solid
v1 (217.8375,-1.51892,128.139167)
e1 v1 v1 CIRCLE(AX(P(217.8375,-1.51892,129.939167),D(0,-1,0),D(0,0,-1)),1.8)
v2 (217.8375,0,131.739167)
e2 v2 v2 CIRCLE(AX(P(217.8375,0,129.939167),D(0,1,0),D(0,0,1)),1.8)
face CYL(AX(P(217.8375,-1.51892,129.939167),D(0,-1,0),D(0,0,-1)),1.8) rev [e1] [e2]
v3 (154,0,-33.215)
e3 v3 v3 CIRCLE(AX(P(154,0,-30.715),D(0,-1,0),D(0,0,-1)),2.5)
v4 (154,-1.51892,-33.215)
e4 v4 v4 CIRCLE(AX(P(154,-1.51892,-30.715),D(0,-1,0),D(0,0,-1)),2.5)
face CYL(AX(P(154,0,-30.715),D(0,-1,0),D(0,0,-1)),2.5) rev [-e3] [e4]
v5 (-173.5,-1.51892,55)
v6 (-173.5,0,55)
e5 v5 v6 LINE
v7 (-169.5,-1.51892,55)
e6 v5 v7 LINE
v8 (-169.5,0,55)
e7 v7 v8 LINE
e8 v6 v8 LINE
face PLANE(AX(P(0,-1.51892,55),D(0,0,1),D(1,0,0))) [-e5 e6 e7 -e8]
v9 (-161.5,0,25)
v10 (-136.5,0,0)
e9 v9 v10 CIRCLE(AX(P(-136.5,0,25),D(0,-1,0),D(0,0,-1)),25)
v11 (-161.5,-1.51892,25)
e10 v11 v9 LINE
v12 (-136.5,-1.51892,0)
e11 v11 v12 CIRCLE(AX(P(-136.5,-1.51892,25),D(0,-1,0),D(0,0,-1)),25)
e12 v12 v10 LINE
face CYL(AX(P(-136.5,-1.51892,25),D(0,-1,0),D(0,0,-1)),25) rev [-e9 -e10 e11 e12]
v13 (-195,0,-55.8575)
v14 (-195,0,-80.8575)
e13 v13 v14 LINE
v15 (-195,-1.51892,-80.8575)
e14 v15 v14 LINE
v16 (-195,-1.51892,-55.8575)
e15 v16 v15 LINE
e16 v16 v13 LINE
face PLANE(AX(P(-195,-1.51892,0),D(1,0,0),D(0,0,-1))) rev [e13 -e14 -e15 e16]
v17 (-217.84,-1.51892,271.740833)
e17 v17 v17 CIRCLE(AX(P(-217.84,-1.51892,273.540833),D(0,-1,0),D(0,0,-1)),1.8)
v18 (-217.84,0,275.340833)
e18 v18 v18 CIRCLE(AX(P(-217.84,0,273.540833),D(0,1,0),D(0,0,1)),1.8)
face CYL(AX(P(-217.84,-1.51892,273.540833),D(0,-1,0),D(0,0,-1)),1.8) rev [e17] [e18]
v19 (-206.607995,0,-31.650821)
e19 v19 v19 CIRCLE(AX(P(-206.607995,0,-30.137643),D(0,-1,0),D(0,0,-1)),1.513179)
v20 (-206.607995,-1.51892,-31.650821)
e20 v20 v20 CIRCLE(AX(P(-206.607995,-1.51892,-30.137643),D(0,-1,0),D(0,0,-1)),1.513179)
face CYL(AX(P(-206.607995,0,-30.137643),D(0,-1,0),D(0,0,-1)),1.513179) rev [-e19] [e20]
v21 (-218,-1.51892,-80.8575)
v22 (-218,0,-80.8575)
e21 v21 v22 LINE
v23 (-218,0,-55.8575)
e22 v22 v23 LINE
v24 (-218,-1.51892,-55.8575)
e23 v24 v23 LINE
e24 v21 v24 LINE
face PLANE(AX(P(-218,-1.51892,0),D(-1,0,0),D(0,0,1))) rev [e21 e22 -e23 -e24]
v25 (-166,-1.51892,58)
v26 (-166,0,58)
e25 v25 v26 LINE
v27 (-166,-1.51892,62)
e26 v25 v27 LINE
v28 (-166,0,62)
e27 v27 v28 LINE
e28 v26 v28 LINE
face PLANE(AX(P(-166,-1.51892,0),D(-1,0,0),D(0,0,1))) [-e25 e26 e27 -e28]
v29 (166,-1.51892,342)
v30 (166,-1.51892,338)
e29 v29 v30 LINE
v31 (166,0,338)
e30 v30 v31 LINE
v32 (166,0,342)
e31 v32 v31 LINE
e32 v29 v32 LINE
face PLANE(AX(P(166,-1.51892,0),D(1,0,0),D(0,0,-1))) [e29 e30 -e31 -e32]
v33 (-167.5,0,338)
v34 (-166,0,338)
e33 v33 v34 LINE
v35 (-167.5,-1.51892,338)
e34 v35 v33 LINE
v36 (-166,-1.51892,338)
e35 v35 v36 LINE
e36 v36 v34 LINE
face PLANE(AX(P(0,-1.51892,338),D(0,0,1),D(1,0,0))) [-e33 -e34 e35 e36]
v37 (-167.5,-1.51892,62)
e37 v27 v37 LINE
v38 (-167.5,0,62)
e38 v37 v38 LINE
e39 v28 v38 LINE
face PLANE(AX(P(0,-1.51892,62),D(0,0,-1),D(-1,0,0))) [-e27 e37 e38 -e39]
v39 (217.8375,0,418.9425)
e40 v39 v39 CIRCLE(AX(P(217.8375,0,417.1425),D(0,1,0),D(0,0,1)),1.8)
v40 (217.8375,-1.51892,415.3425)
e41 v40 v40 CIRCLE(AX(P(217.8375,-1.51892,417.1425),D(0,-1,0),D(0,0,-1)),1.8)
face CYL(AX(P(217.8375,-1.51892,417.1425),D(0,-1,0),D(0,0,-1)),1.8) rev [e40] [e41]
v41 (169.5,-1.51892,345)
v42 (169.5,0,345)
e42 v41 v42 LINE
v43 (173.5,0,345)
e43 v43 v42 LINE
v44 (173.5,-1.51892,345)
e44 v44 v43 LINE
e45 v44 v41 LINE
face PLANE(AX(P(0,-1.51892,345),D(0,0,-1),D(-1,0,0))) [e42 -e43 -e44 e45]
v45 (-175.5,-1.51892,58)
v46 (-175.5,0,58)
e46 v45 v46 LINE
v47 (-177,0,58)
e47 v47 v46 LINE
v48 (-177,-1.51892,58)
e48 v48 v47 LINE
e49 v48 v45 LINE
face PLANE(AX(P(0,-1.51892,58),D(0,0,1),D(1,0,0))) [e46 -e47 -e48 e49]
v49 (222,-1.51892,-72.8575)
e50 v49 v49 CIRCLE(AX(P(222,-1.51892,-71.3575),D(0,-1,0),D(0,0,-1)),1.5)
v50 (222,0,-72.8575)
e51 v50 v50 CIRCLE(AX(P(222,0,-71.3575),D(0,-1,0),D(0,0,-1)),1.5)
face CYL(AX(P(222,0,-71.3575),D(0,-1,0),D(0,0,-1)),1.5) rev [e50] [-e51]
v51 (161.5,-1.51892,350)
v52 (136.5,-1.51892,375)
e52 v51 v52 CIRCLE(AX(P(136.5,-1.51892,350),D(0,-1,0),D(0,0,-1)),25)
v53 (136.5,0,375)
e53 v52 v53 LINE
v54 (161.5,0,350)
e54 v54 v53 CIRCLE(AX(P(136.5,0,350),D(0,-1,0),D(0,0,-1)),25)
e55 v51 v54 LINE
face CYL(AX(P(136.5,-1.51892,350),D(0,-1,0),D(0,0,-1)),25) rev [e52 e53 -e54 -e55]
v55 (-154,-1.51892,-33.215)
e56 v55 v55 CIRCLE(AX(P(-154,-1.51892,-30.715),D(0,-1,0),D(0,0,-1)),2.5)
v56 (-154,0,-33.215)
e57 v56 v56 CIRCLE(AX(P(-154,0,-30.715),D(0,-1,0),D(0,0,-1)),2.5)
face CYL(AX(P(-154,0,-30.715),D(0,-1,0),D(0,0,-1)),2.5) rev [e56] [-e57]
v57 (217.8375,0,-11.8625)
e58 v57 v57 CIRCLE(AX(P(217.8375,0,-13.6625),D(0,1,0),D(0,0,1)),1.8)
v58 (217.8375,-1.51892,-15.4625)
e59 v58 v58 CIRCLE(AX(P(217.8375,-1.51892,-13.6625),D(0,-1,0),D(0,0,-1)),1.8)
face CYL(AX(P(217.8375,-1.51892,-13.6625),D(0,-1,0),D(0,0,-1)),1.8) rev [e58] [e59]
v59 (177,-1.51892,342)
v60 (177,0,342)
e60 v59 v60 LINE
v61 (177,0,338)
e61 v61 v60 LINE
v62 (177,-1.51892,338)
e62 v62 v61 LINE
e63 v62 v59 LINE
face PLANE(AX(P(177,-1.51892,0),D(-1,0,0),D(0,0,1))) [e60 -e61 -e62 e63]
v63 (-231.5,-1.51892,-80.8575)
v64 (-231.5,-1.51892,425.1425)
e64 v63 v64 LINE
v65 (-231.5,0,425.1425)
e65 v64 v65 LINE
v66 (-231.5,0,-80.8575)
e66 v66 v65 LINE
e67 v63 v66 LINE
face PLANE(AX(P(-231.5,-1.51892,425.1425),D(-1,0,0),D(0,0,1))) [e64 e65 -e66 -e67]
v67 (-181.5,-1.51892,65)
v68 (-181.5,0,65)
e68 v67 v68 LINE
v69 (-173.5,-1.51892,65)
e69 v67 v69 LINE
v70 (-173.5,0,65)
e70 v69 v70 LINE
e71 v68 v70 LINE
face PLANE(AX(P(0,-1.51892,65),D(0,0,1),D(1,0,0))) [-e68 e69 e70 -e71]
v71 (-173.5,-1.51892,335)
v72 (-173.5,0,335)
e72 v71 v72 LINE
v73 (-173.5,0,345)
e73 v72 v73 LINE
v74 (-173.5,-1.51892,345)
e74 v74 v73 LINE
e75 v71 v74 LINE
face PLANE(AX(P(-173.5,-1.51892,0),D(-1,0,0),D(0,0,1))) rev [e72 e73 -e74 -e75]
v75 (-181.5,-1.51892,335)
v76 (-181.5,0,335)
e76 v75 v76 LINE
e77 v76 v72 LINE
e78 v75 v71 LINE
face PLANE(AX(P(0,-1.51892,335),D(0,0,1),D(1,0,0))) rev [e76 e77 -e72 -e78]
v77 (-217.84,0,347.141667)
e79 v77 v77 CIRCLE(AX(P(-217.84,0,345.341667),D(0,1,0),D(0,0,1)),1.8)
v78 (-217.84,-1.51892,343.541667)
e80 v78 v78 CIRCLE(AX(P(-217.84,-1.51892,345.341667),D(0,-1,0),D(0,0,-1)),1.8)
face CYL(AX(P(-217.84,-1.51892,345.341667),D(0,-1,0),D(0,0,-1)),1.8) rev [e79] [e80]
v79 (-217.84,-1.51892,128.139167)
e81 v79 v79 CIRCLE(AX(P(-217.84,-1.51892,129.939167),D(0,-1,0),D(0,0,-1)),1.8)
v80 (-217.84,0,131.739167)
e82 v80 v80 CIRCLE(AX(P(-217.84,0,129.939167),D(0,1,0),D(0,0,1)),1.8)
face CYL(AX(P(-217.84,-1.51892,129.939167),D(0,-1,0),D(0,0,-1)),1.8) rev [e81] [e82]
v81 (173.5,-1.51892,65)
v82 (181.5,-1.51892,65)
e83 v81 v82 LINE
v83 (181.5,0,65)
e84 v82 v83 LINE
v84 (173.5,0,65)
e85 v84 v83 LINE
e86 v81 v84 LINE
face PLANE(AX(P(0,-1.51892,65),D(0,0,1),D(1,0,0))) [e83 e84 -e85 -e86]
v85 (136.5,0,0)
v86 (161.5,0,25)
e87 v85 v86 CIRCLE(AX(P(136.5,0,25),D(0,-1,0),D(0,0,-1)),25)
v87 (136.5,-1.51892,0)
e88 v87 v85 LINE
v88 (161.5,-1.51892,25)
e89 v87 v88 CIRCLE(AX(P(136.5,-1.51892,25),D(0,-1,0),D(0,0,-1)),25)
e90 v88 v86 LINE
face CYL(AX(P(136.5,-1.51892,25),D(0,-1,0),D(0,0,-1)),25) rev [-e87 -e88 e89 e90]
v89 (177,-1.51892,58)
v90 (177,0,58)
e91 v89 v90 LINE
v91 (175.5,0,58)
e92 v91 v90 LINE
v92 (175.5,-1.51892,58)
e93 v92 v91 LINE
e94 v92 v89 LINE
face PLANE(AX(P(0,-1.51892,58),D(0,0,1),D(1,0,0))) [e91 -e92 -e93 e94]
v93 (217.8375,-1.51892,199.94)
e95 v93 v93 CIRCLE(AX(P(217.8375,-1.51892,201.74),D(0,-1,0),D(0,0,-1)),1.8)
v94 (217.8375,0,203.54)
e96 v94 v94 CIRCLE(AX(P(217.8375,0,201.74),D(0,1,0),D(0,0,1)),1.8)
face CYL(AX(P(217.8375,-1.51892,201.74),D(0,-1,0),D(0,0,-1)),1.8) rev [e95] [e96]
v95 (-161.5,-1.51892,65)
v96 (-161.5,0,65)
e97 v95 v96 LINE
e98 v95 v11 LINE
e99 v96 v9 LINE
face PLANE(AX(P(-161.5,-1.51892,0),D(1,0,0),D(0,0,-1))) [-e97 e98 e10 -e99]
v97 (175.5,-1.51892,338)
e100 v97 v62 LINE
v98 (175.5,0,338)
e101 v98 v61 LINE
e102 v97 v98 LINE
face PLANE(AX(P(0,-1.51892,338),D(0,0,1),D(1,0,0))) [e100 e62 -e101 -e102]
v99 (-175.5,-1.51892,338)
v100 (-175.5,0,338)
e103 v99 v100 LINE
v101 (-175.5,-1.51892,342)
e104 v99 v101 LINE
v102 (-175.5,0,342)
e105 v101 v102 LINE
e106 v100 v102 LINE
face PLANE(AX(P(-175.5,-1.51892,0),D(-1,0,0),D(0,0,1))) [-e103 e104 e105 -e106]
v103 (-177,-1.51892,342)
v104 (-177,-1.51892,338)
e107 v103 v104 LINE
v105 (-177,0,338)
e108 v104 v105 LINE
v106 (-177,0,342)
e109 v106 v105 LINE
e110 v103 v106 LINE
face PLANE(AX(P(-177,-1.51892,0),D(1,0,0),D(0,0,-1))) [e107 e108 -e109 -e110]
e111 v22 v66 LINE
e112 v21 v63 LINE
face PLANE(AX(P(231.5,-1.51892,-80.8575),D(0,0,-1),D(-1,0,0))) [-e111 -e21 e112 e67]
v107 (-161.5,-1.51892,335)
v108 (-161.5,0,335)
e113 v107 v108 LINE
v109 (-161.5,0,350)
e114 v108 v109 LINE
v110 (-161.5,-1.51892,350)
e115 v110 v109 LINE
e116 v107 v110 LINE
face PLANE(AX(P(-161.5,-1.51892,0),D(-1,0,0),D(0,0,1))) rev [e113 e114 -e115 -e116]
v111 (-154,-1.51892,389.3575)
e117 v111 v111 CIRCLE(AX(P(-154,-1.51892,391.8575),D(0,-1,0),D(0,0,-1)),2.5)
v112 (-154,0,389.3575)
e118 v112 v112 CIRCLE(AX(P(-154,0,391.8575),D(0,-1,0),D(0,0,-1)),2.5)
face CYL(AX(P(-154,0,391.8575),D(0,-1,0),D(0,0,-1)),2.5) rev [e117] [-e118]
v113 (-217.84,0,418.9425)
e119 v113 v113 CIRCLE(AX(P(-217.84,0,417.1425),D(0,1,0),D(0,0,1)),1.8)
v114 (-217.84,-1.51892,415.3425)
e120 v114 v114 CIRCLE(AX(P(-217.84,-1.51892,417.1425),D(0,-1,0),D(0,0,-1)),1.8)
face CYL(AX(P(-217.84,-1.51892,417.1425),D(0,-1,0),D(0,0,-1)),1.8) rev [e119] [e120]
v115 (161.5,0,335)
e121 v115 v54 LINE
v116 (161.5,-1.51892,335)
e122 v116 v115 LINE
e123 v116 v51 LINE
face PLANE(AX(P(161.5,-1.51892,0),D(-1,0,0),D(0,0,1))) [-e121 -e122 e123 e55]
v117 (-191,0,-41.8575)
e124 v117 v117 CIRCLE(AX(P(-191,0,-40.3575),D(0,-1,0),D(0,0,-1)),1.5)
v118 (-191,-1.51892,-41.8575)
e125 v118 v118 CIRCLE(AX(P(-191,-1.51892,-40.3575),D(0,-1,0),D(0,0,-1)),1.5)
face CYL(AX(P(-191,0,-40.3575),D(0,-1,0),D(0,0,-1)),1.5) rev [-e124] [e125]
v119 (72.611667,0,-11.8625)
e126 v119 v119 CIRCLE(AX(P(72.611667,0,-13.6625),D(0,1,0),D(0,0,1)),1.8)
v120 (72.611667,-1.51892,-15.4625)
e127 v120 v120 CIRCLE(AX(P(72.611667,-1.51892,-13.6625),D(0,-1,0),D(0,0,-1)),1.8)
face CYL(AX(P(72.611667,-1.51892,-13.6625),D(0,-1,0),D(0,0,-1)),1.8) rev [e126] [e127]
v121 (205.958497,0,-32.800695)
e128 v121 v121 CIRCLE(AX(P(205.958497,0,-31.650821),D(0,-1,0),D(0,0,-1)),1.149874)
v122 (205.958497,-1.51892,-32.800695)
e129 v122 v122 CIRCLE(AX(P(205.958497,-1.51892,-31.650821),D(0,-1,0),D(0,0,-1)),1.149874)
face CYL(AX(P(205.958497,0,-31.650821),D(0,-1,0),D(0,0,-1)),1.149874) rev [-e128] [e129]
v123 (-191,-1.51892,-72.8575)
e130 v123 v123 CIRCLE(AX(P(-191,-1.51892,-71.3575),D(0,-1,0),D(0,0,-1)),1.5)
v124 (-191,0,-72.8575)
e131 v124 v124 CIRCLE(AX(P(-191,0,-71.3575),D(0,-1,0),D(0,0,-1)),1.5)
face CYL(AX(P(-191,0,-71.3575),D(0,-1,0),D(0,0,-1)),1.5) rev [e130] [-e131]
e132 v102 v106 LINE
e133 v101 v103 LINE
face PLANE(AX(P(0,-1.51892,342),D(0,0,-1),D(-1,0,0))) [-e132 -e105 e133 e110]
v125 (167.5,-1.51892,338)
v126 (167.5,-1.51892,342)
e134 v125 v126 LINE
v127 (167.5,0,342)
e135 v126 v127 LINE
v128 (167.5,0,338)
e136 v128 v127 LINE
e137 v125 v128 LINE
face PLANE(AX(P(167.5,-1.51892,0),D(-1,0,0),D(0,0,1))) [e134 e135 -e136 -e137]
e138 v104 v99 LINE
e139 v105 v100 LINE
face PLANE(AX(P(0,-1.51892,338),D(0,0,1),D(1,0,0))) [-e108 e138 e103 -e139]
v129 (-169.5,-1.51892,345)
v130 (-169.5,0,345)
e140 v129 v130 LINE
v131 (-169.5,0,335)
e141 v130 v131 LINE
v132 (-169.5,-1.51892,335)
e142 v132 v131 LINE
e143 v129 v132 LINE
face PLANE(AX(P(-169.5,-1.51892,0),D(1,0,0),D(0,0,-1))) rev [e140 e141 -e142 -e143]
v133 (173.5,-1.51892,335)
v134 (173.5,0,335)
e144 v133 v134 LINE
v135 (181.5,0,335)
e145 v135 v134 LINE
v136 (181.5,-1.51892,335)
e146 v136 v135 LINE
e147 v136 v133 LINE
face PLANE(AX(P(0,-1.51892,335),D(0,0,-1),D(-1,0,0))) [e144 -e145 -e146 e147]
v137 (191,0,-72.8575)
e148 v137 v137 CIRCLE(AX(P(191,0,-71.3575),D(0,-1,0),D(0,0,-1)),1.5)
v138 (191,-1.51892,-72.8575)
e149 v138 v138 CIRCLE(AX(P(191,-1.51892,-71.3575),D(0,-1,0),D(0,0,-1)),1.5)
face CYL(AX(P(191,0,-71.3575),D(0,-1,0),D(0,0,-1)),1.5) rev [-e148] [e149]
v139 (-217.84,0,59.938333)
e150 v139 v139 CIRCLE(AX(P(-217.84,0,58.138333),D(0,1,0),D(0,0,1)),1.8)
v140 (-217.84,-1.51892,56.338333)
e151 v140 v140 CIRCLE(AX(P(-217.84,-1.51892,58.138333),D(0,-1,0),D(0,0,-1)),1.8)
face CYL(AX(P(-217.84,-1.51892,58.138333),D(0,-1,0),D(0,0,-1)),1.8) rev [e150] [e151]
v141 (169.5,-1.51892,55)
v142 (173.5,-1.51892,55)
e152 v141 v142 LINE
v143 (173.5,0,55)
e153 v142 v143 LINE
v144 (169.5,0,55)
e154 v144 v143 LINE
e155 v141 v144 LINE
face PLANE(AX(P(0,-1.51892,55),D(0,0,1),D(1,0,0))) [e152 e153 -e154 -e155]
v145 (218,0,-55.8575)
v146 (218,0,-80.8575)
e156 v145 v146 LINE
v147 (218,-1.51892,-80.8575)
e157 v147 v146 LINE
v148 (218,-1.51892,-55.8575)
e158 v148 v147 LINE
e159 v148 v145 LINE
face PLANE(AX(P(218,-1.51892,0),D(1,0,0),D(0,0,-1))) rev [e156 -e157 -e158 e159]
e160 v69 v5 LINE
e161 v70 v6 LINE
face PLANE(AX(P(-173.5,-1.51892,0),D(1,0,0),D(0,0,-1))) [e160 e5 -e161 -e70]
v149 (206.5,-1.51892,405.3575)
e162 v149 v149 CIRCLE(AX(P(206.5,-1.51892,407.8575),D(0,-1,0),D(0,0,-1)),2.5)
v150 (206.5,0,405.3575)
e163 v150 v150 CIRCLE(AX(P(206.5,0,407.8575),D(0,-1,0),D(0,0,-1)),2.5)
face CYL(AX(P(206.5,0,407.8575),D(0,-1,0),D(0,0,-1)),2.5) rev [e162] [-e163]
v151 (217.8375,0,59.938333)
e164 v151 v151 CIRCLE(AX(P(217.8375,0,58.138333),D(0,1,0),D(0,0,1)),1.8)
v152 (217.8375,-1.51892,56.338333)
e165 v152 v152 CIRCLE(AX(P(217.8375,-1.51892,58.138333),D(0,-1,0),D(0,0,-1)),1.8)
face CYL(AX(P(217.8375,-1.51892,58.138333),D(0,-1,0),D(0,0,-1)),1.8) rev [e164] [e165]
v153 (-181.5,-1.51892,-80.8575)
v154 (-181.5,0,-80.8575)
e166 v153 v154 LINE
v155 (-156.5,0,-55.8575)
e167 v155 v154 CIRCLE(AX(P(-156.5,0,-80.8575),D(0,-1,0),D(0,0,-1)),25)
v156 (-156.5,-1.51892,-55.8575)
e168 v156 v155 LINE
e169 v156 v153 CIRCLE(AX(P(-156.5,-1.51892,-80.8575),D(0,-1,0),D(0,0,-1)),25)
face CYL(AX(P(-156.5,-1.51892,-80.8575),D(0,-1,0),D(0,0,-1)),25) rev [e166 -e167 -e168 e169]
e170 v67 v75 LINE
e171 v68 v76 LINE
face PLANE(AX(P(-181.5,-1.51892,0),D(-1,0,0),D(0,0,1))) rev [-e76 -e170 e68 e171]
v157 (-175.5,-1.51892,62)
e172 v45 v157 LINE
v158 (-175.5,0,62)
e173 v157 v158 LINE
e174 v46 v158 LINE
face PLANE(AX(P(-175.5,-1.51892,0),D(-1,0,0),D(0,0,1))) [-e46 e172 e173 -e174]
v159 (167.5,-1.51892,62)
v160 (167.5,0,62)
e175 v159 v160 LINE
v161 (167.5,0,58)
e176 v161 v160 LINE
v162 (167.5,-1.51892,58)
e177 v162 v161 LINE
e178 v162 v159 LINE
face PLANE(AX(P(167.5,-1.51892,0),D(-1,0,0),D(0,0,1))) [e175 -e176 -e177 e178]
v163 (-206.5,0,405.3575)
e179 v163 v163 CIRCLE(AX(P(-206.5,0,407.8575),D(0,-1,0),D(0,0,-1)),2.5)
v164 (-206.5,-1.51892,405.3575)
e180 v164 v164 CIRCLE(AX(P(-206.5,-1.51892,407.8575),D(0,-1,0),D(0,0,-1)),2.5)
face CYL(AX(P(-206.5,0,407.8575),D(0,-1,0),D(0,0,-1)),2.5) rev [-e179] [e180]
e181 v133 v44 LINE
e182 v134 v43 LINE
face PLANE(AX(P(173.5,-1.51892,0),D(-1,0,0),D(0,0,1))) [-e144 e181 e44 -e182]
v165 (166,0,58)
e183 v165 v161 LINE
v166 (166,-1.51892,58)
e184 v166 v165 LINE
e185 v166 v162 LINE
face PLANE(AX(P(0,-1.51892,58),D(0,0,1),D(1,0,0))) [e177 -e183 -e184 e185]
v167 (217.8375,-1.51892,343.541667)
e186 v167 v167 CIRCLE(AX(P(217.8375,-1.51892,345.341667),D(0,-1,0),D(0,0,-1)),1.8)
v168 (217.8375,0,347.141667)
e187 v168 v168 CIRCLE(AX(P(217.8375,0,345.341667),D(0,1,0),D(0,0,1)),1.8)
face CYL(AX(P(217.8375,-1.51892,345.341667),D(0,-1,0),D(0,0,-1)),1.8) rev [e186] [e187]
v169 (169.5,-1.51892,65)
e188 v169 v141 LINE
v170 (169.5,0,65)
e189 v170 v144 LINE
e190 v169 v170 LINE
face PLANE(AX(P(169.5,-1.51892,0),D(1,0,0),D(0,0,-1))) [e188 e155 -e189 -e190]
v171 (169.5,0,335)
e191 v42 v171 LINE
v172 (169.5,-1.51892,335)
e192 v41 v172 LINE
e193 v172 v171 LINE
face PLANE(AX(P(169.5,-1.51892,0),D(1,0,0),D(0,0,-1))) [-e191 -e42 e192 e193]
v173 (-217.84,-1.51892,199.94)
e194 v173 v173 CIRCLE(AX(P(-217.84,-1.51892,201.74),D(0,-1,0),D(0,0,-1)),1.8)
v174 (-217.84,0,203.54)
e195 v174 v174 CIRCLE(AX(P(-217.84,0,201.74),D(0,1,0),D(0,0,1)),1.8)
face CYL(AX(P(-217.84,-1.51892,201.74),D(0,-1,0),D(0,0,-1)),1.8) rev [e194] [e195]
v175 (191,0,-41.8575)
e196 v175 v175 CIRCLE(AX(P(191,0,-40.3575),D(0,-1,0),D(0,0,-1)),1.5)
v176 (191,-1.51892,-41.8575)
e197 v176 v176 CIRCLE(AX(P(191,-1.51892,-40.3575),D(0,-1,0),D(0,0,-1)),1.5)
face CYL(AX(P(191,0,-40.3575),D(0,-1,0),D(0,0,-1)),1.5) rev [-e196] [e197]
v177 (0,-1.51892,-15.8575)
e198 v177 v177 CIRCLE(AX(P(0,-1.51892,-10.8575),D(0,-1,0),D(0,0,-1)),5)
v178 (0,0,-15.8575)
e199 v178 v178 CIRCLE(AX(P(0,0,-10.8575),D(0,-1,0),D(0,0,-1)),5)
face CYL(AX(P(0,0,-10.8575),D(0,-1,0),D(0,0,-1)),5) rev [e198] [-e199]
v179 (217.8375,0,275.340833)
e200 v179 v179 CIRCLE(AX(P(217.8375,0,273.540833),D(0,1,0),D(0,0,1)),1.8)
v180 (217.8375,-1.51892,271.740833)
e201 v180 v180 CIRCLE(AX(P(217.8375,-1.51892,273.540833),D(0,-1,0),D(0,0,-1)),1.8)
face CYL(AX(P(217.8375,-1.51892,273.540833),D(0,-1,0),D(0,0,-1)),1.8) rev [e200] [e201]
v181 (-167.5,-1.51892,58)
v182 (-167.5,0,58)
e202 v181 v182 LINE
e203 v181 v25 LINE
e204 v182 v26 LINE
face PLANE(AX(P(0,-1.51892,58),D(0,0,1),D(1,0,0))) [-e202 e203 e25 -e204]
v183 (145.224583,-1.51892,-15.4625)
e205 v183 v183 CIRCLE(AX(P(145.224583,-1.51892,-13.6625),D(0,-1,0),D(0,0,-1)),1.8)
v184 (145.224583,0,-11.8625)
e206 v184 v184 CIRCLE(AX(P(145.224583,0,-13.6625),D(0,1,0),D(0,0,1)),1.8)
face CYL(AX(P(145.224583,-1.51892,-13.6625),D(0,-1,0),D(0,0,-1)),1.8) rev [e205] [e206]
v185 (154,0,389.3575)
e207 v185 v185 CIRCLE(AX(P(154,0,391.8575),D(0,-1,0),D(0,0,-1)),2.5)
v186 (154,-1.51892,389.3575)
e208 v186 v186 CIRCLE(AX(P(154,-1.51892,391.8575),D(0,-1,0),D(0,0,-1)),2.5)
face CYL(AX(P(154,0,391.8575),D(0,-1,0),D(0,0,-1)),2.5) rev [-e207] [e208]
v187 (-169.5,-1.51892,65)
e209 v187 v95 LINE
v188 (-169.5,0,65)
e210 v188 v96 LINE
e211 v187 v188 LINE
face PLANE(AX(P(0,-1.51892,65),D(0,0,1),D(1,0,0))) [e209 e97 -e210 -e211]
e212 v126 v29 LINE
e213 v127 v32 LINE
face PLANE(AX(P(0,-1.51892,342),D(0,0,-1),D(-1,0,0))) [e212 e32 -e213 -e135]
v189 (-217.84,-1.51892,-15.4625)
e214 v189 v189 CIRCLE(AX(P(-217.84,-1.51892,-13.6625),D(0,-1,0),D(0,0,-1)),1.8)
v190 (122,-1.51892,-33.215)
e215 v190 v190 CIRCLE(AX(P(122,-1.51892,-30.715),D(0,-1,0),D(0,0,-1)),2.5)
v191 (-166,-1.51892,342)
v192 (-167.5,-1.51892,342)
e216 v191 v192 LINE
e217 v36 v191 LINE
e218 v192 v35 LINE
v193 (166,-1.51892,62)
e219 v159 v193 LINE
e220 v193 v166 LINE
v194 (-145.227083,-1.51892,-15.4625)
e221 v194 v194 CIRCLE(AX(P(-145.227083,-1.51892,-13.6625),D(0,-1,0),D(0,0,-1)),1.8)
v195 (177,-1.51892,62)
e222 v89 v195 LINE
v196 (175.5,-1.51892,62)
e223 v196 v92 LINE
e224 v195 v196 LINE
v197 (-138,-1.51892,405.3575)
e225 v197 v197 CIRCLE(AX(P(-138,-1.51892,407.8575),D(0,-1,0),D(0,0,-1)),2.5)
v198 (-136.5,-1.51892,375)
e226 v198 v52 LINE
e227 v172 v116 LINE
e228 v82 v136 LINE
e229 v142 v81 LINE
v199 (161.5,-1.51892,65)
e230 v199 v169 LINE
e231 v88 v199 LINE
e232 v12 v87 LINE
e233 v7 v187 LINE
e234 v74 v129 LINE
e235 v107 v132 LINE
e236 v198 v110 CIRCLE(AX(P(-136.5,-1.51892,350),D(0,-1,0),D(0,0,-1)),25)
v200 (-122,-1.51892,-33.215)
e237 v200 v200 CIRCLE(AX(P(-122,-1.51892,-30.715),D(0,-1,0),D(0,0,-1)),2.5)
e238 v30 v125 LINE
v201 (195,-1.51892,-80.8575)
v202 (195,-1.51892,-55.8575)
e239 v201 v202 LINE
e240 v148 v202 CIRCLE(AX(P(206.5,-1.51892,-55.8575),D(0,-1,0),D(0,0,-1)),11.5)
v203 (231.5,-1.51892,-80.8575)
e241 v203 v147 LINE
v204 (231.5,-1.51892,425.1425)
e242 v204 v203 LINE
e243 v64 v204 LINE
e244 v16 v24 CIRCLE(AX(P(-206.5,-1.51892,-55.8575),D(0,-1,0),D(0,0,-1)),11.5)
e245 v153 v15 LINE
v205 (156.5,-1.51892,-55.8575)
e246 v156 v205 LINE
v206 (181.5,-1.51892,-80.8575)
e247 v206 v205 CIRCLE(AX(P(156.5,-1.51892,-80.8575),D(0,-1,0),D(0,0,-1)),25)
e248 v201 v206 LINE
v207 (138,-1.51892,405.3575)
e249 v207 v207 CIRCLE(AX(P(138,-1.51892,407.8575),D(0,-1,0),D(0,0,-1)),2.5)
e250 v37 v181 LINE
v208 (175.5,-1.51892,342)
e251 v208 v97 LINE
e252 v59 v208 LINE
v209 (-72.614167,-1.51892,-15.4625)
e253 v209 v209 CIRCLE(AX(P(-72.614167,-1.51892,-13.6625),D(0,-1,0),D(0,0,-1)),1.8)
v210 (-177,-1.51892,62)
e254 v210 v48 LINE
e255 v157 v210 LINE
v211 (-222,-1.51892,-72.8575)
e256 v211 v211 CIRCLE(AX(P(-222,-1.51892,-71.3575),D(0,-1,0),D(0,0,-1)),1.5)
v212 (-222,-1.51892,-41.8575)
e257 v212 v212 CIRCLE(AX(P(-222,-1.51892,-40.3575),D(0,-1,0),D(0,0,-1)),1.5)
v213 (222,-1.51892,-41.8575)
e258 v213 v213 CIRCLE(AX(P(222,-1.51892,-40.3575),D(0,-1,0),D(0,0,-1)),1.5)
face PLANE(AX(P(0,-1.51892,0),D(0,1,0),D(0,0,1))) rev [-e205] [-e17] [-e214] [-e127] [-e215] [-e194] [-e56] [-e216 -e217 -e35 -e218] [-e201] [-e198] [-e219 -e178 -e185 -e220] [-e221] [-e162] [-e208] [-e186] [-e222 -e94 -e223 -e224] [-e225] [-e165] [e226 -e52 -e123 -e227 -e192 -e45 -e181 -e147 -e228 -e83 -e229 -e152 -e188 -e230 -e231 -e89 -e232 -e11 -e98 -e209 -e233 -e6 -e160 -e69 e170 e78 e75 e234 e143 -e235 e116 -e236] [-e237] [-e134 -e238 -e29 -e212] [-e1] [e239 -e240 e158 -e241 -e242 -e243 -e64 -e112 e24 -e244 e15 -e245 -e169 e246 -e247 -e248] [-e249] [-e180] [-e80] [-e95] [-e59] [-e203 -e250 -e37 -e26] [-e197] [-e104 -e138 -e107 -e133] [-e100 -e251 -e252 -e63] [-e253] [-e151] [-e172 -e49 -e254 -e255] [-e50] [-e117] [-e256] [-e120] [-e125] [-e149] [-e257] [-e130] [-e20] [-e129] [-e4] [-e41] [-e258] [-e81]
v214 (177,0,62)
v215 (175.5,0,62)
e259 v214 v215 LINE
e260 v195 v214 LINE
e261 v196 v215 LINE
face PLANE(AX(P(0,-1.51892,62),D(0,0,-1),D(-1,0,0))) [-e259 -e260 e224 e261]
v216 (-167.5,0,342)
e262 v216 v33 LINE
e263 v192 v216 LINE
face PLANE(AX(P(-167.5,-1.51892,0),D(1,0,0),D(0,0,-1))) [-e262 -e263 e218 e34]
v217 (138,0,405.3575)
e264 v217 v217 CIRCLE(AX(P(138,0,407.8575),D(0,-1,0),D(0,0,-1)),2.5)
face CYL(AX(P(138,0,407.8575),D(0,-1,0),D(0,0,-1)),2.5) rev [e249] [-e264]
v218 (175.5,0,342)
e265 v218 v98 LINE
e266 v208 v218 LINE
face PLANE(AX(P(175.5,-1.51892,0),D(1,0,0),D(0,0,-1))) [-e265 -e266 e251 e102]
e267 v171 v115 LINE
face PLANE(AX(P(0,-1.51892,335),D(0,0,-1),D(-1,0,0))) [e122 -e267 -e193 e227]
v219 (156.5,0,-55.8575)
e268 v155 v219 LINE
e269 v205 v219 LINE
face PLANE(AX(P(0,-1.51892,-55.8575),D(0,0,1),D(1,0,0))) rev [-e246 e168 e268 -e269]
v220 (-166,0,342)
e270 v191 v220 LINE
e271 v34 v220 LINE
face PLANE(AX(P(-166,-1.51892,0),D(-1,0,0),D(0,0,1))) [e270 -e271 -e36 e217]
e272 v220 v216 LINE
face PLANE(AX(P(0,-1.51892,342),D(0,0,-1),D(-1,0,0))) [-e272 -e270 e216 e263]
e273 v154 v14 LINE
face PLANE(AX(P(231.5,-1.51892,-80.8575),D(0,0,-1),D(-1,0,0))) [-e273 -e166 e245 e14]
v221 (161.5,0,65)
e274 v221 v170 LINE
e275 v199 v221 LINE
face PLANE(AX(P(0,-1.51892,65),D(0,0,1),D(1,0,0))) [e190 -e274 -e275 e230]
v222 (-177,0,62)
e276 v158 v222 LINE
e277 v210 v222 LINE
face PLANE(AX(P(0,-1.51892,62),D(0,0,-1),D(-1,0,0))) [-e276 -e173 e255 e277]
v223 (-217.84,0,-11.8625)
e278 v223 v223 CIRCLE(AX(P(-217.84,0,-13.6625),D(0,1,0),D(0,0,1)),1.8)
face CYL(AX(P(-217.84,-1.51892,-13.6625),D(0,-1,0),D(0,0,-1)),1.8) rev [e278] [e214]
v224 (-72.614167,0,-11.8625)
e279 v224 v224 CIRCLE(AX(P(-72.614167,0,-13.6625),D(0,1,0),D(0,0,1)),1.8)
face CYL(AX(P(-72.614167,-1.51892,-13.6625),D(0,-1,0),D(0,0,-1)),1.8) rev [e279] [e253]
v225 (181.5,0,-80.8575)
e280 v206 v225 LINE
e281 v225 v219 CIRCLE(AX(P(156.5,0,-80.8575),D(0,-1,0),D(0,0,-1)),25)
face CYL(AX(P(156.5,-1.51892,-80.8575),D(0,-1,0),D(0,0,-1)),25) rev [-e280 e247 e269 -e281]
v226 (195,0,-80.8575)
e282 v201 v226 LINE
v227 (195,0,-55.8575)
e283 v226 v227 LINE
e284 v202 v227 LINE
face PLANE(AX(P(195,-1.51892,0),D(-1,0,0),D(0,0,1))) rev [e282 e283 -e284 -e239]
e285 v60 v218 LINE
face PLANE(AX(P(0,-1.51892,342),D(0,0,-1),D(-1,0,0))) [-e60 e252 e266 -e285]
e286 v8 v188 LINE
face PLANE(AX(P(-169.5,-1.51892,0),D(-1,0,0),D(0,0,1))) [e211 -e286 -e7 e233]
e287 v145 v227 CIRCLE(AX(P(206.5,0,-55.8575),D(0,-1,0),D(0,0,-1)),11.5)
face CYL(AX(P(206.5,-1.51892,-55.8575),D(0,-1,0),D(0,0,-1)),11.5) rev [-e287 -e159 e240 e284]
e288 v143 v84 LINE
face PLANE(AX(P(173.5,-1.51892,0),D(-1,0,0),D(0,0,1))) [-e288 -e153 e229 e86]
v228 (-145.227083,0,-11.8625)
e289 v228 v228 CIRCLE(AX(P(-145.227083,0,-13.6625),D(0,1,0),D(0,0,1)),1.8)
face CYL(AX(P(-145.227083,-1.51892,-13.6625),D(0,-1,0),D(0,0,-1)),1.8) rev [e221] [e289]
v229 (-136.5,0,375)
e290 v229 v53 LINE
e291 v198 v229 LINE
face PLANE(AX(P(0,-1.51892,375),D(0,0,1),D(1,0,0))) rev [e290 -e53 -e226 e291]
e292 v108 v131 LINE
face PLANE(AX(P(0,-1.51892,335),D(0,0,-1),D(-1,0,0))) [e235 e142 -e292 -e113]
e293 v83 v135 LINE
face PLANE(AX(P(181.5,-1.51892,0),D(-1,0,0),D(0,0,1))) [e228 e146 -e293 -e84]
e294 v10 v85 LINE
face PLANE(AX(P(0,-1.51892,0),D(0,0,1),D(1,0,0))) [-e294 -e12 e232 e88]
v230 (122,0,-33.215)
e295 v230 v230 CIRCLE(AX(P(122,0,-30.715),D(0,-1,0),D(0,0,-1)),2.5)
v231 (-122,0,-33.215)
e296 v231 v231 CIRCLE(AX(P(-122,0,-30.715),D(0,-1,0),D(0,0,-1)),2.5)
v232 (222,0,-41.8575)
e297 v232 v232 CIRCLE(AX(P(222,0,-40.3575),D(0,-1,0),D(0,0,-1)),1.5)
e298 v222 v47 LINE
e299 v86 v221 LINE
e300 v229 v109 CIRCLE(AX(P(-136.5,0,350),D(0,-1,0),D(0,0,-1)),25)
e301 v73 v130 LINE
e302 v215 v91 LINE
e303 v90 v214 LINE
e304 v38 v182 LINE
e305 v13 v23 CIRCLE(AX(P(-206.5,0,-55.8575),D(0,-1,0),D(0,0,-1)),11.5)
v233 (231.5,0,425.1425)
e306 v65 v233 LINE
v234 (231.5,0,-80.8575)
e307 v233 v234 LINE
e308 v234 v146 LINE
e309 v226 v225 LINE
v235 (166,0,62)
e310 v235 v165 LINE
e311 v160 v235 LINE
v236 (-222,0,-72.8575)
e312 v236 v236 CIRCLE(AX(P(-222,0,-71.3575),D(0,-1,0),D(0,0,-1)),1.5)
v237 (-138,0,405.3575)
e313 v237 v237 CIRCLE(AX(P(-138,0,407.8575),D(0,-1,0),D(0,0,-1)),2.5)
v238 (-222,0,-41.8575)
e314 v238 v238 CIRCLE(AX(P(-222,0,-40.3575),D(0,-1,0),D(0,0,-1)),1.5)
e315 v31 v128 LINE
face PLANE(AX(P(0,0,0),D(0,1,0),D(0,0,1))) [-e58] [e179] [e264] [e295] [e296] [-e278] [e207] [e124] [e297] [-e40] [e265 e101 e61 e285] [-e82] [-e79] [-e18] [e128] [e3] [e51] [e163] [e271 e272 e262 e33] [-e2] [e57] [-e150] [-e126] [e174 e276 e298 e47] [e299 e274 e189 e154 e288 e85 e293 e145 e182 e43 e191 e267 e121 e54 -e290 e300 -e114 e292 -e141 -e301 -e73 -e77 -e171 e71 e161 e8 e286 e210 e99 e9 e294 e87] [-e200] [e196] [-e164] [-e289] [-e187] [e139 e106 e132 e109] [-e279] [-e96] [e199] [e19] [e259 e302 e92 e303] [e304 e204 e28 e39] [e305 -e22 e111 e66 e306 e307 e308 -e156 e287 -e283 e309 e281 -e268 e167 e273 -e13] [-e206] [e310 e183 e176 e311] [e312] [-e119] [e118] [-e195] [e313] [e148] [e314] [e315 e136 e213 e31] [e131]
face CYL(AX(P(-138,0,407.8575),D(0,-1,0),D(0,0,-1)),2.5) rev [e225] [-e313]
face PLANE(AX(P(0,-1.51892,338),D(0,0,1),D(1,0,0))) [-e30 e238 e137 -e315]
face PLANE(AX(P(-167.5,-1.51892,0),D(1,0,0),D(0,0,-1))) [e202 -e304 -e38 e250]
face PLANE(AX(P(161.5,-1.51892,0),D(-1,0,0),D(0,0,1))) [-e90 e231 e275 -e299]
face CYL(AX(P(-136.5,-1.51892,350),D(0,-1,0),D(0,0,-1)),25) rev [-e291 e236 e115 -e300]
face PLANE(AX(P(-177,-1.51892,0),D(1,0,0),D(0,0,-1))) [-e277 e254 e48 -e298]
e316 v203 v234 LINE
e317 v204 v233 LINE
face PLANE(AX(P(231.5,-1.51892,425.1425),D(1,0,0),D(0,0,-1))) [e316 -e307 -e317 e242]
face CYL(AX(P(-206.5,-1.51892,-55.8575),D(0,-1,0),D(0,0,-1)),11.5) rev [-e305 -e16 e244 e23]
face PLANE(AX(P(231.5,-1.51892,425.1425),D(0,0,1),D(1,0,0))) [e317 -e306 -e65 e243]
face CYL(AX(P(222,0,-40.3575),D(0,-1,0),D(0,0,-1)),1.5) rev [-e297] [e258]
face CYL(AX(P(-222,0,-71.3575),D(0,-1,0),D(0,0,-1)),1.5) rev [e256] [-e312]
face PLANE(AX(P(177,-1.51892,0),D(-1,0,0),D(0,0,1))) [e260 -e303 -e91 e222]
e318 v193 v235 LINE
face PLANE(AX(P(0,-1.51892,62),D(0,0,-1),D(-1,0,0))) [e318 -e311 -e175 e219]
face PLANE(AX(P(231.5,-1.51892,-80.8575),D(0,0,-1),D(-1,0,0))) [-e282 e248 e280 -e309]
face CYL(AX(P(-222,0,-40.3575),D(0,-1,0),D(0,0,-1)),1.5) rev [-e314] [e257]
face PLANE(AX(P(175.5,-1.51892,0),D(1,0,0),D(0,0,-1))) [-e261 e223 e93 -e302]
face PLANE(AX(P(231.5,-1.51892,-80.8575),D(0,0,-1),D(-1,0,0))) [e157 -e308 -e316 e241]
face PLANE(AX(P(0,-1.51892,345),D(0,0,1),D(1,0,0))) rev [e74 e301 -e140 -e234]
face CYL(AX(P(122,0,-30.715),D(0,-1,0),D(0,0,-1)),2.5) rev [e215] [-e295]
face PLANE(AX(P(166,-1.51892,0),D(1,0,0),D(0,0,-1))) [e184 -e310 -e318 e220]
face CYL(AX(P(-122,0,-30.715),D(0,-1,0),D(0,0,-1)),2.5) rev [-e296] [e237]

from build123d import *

# Parameters (mm, degrees)
SKETCH24_W               = 463
SKETCH24_H               = 506
BASE_FLANGE1_DEPTH       = 1.51892
SKETCH33_W               = 1.5
SKETCH33_H               = 4
SKETCH33_R               = 2.5
SKETCH33_R_2             = 1.5
SKETCH33_R_3             = 5
CUT_EXTRUDE1_DEPTH       = 1.51892
SKETCH35_R               = 1.513178902
SKETCH35_R_2             = 1.149873802
CUT_EXTRUDE3_DEPTH       = 10
M3_CLEARANCE_HOLE1_D     = 3.6
M3_CLEARANCE_HOLE1_DEPTH = 11.938
M3_CLEARANCE_HOLE1_TIP   = 1.081549114


# Sheet-metal steps are written as plain solids
with BuildPart() as part:
    # Sketch24 → Base-Flange1 (new body)
    with BuildSketch(Plane(origin=(0, 0, 0), x_dir=(1, 0, 0), z_dir=(0, 1, 0))):
        with Locations((0, -172.1425)):
            Rectangle(SKETCH24_W, SKETCH24_H)
    extrude(amount=-BASE_FLANGE1_DEPTH)

    # Sketch33 → Cut-Extrude1 (cut)
    with BuildSketch(Plane.XZ.offset(1.51892)):
        with BuildLine():
            Line((136.5, 375), (-136.5, 375))
            ThreePointArc((-136.5, 375), (-154.17766953, 367.67766953), (-161.5, 350))
            Line((-161.5, 350), (-161.5, 335))
            Line((-161.5, 335), (-169.5, 335))
            Line((-169.5, 335), (-169.5, 345))
            Line((-169.5, 345), (-173.5, 345))
            Line((-173.5, 345), (-173.5, 335))
            Line((-173.5, 335), (-181.5, 335))
            Line((-181.5, 335), (-181.5, 65))
            Line((-181.5, 65), (-173.5, 65))
            Line((-173.5, 65), (-173.5, 55))
            Line((-173.5, 55), (-169.5, 55))
            Line((-169.5, 55), (-169.5, 65))
            Line((-169.5, 65), (-161.5, 65))
            Line((-161.5, 65), (-161.5, 25))
            ThreePointArc((-161.5, 25), (-154.17766953, 7.32233047), (-136.5, 0))
            Line((-136.5, 0), (136.5, 0))
            ThreePointArc((136.5, 0), (154.17766953, 7.32233047), (161.5, 25))
            Line((161.5, 25), (161.5, 65))
            Line((161.5, 65), (169.5, 65))
            Line((169.5, 65), (169.5, 55))
            Line((169.5, 55), (173.5, 55))
            Line((173.5, 55), (173.5, 65))
            Line((173.5, 65), (181.5, 65))
            Line((181.5, 65), (181.5, 335))
            Line((181.5, 335), (173.5, 335))
            Line((173.5, 335), (173.5, 345))
            Line((173.5, 345), (169.5, 345))
            Line((169.5, 345), (169.5, 335))
            Line((169.5, 335), (161.5, 335))
            Line((161.5, 335), (161.5, 350))
            ThreePointArc((161.5, 350), (154.17766953, 367.67766953), (136.5, 375))
        make_face()
        with Locations((-176.25, 60)):
            Rectangle(SKETCH33_W, SKETCH33_H)
        with Locations((-166.75, 60)):
            Rectangle(SKETCH33_W, SKETCH33_H)
        with Locations((176.25, 60)):
            Rectangle(SKETCH33_W, SKETCH33_H)
        with Locations((166.75, 60)):
            Rectangle(SKETCH33_W, SKETCH33_H)
        with Locations((176.25, 340)):
            Rectangle(SKETCH33_W, SKETCH33_H)
        with Locations((166.75, 340)):
            Rectangle(SKETCH33_W, SKETCH33_H)
        with Locations((-166.75, 340)):
            Rectangle(SKETCH33_W, SKETCH33_H)
        with Locations((-176.25, 340)):
            Rectangle(SKETCH33_W, SKETCH33_H)
        with BuildLine():
            Line((195, -55.8575), (195, -80.8575))
            Line((195, -80.8575), (218, -80.8575))
            Line((218, -80.8575), (218, -55.8575))
            ThreePointArc((218, -55.8575), (206.5, -44.3575), (195, -55.8575))
        make_face()
        with BuildLine():
            ThreePointArc((-156.5, -55.8575), (-174.17766953, -63.17983047), (-181.5, -80.8575))
            Line((-181.5, -80.8575), (181.5, -80.8575))
            ThreePointArc((181.5, -80.8575), (174.17766953, -63.17983047), (156.5, -55.8575))
            Line((156.5, -55.8575), (-156.5, -55.8575))
        make_face()
        with BuildLine():
            Line((-218, -55.8575), (-218, -80.8575))
            Line((-218, -80.8575), (-195, -80.8575))
            Line((-195, -80.8575), (-195, -55.8575))
            ThreePointArc((-195, -55.8575), (-206.5, -44.3575), (-218, -55.8575))
        make_face()
        with Locations(Location((-206.5, 407.8575, 0), (0, 0, 270))):
            Circle(SKETCH33_R)
        with Locations(Location((-154, 391.8575, 0), (0, 0, 270))):
            Circle(SKETCH33_R)
        with Locations(Location((-138, 407.8575, 0), (0, 0, 270))):
            Circle(SKETCH33_R)
        with Locations(Location((138, 407.8575, 0), (0, 0, 270))):
            Circle(SKETCH33_R)
        with Locations(Location((154, 391.8575, 0), (0, 0, 270))):
            Circle(SKETCH33_R)
        with Locations(Location((206.5, 407.8575, 0), (0, 0, 270))):
            Circle(SKETCH33_R)
        with Locations(Location((154, -30.715, 0), (0, 0, 270))):
            Circle(SKETCH33_R)
        with Locations(Location((122, -30.715, 0), (0, 0, 270))):
            Circle(SKETCH33_R)
        with Locations(Location((191, -40.3575, 0), (0, 0, 270))):
            Circle(SKETCH33_R_2)
        with Locations(Location((191, -71.3575, 0), (0, 0, 270))):
            Circle(SKETCH33_R_2)
        with Locations(Location((222, -40.3575, 0), (0, 0, 270))):
            Circle(SKETCH33_R_2)
        with Locations(Location((222, -71.3575, 0), (0, 0, 270))):
            Circle(SKETCH33_R_2)
        with Locations(Location((-154, -30.715, 0), (0, 0, 270))):
            Circle(SKETCH33_R)
        with Locations(Location((-122, -30.715, 0), (0, 0, 270))):
            Circle(SKETCH33_R)
        with Locations(Location((-222, -40.3575, 0), (0, 0, 270))):
            Circle(SKETCH33_R_2)
        with Locations(Location((-222, -71.3575, 0), (0, 0, 270))):
            Circle(SKETCH33_R_2)
        with Locations(Location((-191, -71.3575, 0), (0, 0, 270))):
            Circle(SKETCH33_R_2)
        with Locations(Location((-191, -40.3575, 0), (0, 0, 270))):
            Circle(SKETCH33_R_2)
        with Locations(Location((0, -10.8575, 0), (0, 0, 270))):
            Circle(SKETCH33_R_3)
    extrude(amount=-CUT_EXTRUDE1_DEPTH, mode=Mode.SUBTRACT)

    # Sketch35 → Cut-Extrude3 (cut)
    with BuildSketch(Plane.XZ.offset(1.51892)):
        with Locations(Location((-206.607994526, -30.137642513, 0), (0, 0, 270))):
            Circle(SKETCH35_R)
        with Locations(Location((205.958496696, -31.650821415, 0), (0, 0, 270))):
            Circle(SKETCH35_R_2)
    extrude(amount=-CUT_EXTRUDE3_DEPTH, mode=Mode.SUBTRACT)

    # M3 Clearance Hole1
    with Locations(Plane(origin=(0, -1.51892, 0), x_dir=(-1, 0, 0), z_dir=(0, -1, 0))):
        with Locations((217.84, -417.1425), (-217.8375, -417.1425), (217.84, -345.341666667), (217.84, -273.540833333), (217.84, -201.74), (217.84, -129.939166667), (217.84, -58.138333333), (-217.8375, -58.138333333), (-217.8375, -129.939166667), (-217.8375, -201.74), (-217.8375, -273.540833333), (-217.8375, -345.341666667), (145.227083333, 13.6625), (72.614166667, 13.6625), (0.00125, 13.6625), (-72.611666667, 13.6625), (-145.224583333, 13.6625), (217.84, 13.6625), (-217.8375, 13.6625)):
            Hole(M3_CLEARANCE_HOLE1_D / 2, depth=M3_CLEARANCE_HOLE1_DEPTH)
            with Locations((0, 0, -(M3_CLEARANCE_HOLE1_DEPTH + M3_CLEARANCE_HOLE1_TIP / 2))):  # 118° drill point
                Cone(0, M3_CLEARANCE_HOLE1_D / 2, M3_CLEARANCE_HOLE1_TIP, mode=Mode.SUBTRACT)


solid = part.part
